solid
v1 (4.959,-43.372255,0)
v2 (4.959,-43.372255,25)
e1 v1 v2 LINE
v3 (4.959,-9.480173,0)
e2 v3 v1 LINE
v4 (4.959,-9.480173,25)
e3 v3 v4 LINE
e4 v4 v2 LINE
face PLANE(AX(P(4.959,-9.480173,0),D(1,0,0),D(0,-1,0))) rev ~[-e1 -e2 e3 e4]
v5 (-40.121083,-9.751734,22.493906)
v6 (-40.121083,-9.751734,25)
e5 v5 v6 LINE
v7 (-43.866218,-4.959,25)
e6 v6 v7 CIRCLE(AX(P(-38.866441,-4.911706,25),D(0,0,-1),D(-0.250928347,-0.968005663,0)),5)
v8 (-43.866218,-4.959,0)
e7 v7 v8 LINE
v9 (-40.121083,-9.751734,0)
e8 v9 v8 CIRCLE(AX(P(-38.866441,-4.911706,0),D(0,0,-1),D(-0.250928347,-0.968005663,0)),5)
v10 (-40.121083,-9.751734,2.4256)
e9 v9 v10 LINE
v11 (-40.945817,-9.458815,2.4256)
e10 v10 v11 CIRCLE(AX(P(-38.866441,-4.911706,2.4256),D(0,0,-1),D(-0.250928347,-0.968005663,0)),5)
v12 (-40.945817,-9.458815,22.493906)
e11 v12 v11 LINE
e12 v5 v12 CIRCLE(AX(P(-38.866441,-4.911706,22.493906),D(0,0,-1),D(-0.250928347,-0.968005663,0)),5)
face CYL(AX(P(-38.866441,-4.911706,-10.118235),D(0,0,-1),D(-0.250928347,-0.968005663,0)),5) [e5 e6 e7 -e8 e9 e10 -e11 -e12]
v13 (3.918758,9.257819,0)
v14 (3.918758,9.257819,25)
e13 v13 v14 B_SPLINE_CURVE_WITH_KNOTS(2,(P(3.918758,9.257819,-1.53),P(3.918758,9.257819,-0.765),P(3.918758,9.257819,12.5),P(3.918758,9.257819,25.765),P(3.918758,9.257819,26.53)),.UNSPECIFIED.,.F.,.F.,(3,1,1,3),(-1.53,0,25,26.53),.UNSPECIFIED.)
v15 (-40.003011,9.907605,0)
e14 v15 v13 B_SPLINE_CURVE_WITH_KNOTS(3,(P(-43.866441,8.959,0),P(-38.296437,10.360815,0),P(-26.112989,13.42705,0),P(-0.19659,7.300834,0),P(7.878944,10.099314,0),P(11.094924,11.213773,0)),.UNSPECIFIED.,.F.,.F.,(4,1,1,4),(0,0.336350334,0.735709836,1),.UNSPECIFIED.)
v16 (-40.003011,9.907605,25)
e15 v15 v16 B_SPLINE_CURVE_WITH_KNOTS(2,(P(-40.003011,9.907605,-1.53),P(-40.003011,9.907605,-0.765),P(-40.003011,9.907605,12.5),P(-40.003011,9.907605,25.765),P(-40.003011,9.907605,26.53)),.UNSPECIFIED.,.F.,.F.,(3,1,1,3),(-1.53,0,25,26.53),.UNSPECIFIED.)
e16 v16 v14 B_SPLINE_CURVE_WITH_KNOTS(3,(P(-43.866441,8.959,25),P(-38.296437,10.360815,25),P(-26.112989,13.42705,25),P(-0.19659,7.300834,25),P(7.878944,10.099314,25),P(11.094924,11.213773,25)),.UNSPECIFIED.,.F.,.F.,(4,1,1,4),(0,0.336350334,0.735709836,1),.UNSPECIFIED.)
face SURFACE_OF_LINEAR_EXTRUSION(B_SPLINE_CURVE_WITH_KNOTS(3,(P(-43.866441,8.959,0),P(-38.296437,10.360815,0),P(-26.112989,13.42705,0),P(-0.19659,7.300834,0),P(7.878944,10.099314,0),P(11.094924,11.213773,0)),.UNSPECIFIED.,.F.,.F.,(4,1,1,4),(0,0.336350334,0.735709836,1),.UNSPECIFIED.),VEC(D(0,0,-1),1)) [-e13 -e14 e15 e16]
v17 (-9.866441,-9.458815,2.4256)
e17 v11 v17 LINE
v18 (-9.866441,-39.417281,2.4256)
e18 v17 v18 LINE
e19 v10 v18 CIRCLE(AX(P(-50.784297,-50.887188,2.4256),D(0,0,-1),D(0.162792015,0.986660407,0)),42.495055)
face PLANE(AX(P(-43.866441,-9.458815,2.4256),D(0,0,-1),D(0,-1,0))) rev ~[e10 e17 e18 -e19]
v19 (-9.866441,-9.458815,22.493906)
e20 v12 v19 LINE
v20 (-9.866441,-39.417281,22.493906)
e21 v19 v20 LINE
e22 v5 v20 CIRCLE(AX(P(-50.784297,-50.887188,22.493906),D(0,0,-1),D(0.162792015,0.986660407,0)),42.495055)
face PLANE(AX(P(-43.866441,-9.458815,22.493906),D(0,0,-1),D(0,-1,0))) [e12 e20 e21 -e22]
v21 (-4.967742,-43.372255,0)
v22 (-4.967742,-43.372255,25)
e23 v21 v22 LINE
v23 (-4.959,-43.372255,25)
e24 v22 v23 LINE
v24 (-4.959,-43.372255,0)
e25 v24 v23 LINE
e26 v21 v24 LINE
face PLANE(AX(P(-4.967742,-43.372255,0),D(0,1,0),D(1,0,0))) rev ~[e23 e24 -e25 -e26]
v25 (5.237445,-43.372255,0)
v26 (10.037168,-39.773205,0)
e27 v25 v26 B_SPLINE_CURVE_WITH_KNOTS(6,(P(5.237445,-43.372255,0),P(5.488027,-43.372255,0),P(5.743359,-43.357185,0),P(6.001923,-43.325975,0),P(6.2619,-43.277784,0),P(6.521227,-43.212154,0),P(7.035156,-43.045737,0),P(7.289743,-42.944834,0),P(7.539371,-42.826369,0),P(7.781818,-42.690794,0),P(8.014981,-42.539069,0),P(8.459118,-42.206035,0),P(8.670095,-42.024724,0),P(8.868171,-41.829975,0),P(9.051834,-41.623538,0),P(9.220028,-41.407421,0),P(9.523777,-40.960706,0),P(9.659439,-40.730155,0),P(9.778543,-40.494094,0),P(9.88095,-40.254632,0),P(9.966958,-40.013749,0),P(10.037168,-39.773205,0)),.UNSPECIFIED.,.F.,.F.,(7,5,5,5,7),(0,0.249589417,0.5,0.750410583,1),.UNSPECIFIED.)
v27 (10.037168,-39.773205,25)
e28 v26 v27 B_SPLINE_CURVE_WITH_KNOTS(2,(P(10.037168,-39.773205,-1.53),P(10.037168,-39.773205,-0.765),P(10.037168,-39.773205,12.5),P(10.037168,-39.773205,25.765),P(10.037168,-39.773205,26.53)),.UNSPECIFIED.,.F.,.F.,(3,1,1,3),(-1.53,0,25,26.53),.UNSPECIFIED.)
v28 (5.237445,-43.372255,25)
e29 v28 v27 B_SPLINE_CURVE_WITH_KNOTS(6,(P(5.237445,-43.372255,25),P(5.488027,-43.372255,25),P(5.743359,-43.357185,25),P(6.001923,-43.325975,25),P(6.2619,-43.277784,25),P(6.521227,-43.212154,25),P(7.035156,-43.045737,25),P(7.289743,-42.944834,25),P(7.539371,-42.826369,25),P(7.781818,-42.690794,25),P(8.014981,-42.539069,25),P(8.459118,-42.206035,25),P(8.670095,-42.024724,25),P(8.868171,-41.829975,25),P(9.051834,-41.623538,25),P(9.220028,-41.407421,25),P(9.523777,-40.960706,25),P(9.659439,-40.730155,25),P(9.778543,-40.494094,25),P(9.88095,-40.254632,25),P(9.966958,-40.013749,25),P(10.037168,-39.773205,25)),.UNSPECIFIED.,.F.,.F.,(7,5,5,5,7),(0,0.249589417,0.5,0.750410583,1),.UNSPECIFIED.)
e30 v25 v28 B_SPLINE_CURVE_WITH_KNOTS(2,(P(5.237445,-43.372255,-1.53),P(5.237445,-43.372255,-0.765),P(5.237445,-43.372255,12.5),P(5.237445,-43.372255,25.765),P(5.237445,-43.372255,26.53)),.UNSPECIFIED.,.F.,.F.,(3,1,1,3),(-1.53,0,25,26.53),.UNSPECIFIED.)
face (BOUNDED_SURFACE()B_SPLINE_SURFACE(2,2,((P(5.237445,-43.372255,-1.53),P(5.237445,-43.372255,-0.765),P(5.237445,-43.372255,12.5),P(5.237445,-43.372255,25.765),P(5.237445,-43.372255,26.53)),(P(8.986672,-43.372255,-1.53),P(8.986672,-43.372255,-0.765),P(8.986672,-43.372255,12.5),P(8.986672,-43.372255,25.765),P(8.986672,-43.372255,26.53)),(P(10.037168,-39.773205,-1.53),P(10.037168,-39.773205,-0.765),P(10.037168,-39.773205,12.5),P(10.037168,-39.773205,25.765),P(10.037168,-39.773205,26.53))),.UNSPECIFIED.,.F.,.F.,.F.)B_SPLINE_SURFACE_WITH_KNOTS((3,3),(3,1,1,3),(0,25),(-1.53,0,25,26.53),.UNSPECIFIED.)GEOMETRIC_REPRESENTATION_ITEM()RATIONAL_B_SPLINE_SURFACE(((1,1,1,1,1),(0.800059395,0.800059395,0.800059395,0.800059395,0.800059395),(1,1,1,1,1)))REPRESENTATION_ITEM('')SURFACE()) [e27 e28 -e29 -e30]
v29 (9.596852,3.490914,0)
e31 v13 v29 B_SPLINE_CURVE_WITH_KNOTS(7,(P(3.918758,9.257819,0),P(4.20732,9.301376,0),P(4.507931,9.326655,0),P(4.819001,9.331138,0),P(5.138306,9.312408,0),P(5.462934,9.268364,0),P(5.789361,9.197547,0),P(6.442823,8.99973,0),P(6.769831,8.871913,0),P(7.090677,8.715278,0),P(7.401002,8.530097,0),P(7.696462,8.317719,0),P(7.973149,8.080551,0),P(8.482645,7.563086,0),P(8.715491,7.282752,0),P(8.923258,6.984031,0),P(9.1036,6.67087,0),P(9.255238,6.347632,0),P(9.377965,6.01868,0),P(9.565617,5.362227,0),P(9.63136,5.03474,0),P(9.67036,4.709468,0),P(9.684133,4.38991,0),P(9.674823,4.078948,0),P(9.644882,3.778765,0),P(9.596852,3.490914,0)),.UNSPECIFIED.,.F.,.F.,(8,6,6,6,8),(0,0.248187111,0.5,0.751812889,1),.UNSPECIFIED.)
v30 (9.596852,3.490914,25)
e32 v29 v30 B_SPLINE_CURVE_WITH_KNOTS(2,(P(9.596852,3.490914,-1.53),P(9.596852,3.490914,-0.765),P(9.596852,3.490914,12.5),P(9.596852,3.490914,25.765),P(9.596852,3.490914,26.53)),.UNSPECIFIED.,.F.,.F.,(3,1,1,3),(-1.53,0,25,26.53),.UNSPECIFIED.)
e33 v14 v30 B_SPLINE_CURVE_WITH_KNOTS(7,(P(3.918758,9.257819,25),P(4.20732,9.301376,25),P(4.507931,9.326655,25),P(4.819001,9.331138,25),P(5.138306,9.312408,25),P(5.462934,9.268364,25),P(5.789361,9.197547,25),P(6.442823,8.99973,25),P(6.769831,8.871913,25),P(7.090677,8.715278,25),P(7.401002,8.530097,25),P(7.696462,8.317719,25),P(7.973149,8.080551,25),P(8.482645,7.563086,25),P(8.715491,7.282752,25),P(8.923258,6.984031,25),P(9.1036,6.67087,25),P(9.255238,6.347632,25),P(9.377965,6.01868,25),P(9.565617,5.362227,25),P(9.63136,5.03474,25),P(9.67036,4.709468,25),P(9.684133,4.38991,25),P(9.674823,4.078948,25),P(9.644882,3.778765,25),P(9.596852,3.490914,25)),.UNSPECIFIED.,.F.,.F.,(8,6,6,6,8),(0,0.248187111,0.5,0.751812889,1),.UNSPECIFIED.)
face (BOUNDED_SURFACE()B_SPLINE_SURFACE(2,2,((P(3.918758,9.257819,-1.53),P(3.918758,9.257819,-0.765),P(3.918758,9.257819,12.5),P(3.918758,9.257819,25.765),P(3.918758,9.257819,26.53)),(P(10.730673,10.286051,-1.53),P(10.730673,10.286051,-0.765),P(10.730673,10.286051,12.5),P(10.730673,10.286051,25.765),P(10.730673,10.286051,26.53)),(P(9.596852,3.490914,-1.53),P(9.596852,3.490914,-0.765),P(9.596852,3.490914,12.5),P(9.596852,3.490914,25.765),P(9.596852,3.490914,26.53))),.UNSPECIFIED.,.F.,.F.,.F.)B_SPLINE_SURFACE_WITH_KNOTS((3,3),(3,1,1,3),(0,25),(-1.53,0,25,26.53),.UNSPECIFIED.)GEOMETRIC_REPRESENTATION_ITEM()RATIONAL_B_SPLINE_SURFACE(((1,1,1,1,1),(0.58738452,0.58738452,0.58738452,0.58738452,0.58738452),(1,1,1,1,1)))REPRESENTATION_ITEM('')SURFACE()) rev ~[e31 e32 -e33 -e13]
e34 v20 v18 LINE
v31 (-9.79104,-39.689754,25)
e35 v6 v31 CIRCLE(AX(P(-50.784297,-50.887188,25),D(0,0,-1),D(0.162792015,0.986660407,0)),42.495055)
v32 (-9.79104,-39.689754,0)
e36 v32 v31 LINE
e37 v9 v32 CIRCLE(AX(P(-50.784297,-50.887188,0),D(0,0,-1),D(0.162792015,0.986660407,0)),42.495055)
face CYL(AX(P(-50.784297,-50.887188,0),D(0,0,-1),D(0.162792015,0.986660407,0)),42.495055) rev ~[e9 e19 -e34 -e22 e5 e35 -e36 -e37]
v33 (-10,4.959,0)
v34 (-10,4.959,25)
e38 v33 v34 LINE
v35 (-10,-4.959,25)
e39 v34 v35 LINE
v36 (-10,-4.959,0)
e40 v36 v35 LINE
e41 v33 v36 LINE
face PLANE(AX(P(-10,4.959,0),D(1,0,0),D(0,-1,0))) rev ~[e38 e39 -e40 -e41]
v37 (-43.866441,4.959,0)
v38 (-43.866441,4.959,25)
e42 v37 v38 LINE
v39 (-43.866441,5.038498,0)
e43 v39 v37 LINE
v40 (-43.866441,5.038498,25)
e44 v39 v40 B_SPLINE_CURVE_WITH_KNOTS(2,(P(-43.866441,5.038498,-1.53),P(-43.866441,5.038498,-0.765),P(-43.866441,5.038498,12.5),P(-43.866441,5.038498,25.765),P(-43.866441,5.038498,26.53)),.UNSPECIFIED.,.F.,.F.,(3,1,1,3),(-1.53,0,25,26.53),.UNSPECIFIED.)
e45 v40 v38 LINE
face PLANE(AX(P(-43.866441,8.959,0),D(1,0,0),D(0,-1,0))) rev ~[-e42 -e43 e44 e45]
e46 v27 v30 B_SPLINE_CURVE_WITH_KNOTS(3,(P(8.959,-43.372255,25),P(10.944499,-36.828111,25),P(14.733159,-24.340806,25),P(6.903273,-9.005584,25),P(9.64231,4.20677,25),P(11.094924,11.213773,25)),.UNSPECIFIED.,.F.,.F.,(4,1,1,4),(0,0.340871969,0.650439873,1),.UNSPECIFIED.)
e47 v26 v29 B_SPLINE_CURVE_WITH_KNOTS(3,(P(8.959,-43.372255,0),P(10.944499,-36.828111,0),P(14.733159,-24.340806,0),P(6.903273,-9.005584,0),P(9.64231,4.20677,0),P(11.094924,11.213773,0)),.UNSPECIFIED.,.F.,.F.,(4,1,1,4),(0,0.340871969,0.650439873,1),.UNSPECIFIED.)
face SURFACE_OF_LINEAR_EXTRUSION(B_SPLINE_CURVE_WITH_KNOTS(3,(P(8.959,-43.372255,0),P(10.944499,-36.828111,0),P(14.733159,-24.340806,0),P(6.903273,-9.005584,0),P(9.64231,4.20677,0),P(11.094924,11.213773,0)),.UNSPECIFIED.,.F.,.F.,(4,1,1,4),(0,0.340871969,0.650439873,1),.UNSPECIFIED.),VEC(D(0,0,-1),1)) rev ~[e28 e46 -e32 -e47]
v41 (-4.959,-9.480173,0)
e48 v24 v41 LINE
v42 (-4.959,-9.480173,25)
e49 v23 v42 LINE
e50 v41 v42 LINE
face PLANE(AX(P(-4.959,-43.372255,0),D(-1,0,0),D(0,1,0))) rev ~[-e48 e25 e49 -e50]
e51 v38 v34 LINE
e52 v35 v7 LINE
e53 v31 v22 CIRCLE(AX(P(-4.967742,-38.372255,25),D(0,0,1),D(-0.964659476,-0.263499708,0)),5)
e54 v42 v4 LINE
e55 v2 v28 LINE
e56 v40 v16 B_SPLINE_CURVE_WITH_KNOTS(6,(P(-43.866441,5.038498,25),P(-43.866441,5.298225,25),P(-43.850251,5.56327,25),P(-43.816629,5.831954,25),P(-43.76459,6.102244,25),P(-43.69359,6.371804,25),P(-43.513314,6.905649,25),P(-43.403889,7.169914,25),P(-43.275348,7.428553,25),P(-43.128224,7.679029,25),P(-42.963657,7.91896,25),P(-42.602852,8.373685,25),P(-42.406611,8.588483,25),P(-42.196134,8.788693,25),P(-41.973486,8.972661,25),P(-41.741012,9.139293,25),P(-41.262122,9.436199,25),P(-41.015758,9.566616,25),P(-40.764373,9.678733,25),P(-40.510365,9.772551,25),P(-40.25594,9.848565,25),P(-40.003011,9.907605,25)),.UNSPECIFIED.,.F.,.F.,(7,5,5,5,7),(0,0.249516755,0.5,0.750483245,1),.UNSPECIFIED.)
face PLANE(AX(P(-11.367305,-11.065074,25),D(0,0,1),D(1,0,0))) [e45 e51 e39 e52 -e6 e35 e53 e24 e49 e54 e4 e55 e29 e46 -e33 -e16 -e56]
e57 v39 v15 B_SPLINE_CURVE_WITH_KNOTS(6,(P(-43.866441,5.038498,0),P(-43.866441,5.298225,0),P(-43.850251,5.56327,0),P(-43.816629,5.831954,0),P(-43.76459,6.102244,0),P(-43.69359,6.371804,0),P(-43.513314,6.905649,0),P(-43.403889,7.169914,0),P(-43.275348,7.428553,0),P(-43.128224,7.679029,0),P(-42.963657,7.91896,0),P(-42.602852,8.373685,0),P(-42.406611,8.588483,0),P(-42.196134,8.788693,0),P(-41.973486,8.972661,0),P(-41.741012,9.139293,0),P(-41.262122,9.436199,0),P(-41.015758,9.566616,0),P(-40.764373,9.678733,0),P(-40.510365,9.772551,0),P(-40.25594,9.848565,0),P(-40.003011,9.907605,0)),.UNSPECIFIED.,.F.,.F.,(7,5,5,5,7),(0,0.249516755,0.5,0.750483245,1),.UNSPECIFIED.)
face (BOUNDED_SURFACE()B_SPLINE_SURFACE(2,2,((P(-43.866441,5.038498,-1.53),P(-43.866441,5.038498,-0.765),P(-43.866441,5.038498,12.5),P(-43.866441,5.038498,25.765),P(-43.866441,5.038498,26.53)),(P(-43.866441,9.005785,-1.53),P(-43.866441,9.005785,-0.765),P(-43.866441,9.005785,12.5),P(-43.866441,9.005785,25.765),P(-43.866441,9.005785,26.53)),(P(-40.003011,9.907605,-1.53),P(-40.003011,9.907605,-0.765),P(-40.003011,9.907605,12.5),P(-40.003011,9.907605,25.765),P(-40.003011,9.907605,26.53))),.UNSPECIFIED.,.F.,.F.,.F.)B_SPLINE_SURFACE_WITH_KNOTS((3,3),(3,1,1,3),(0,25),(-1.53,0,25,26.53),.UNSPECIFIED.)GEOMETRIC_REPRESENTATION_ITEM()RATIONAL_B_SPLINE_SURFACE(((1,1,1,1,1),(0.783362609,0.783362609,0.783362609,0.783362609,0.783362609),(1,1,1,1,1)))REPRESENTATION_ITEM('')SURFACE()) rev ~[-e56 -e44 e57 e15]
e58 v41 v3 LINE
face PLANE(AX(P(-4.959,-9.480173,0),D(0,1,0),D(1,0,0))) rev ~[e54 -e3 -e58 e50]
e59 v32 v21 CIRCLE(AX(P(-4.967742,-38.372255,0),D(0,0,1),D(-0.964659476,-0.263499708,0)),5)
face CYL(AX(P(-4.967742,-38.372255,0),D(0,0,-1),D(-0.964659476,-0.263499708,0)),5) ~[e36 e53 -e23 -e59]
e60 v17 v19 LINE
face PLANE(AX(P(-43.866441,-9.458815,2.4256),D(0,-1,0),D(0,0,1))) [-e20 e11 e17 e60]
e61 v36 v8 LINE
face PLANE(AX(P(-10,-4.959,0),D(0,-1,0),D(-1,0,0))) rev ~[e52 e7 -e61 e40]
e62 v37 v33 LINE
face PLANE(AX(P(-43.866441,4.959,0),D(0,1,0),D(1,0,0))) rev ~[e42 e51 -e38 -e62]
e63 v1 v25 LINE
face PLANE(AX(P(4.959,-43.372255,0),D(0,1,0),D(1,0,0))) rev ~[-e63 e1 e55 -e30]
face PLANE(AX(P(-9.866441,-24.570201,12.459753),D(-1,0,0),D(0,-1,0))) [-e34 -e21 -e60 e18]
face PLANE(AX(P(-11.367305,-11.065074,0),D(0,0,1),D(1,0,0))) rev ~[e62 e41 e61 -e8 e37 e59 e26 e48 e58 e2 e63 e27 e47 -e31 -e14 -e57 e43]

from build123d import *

# Parameters (mm, degrees)
F1_DEPTH    = 25
F2_W        = 30.2227726206
F2_H        = 20.068306243
F3_DEPTH    = 34
F4_T1_DEPTH = 45.2364697276
F5_R        = 5


# Not quite as in the source:
# - a fillet or chamfer that OpenCascade refuses, or shapes differently, is made with other operations: its cross-section is extruded or revolved along the edge and cut away or added


with BuildPart() as f1:
    # F0 (on Top) → F1 (new body)
    with BuildSketch(Plane.XY):
        with BuildLine():
            Line((-4.959, -9.4801727682), (4.959, -9.4801727682))
            Line((4.959, -9.4801727682), (4.959, -43.3722550981))
            Line((4.959, -43.3722550981), (8.959, -43.3722550981))
            add(Edge.make_bspline(
                [(8.959, -43.3722550981), (10.9444993843, -36.8281108572), (14.7331593025, -24.340805557), (6.9032731799, -9.0055840914), (9.6423102918, 4.2067701187), (11.0949236172, 11.2137733098)],
                knots=[0, 0, 0, 0, 0.3408719694, 0.6504398731, 1, 1, 1, 1], degree=3))
            add(Edge.make_bspline(
                [(-43.8664413989, 8.959), (-38.2964370805, 10.3608151634), (-26.1129886059, 13.4270502754), (-0.196589781, 7.3008338793), (7.8789436209, 10.0993137603), (11.0949236172, 11.2137733098)],
                knots=[0, 0, 0, 0, 0.3363503338, 0.7357098355, 1, 1, 1, 1], degree=3))
            Line((-43.8664413989, 8.959), (-43.8664413989, 4.959))
            Line((-43.8664413989, 4.959), (-10, 4.959))
            Line((-10, 4.959), (-10, -4.959))
            Line((-10, -4.959), (-43.8664413989, -4.959))
            Line((-43.8664413989, -4.959), (-43.8664413989, -8.959))
            ThreePointArc((-43.8664413989, -8.959), (-22.3244394728, -19.3298404084), (-9.7910396518, -39.6897536373))
            ThreePointArc((-9.7910396518, -39.6897536373), (-8.0019231601, -42.3463897646), (-4.9677422736, -43.3722550981))
            Line((-4.9677422736, -43.3722550981), (-4.959, -43.3722550981))
            Line((-4.959, -43.3722550981), (-4.959, -9.4801727682))
        make_face()
    extrude(amount=F1_DEPTH)

    # F2 (on face) → F3 (cut)
    with BuildSketch(Plane(origin=(-43.8664413989, 0, 0), x_dir=(0, -1, 0), z_dir=(-1, 0, 0))):
        with Locations((24.5702010579, 12.4597531976)):
            Rectangle(F2_W, F2_H)
    extrude(amount=-F3_DEPTH, mode=Mode.SUBTRACT)

    # F4: fillet of radius 5 on 1 edges, made by hand

    # F4_s2 → F4_t1 (cut)
    with BuildSketch(Plane.XY.offset(-10.1182348638)):
        with BuildLine():
            ThreePointArc((-40.1210831358, -9.7517343717), (-42.8207560477, -7.971672665), (-43.8664413989, -4.9117060545))
            Line((-43.8664413989, -4.9117060545), (-43.8664413989, -8.959))
            ThreePointArc((-43.8664413989, -8.959), (-41.9848306621, -9.3131688624), (-40.1210831358, -9.7517343717))
        make_face()
    extrude(amount=F4_T1_DEPTH, mode=Mode.SUBTRACT)

    # F5
    f5_edges = [f1.edges().sort_by_distance(p)[0] for p in [
        (8.959, -43.372255, 12.5),
        (11.094924, 11.213773, 12.5),
        (-43.866441, 8.959, 12.5),
    ]]
    fillet(f5_edges, radius=F5_R)


solid = f1.part
